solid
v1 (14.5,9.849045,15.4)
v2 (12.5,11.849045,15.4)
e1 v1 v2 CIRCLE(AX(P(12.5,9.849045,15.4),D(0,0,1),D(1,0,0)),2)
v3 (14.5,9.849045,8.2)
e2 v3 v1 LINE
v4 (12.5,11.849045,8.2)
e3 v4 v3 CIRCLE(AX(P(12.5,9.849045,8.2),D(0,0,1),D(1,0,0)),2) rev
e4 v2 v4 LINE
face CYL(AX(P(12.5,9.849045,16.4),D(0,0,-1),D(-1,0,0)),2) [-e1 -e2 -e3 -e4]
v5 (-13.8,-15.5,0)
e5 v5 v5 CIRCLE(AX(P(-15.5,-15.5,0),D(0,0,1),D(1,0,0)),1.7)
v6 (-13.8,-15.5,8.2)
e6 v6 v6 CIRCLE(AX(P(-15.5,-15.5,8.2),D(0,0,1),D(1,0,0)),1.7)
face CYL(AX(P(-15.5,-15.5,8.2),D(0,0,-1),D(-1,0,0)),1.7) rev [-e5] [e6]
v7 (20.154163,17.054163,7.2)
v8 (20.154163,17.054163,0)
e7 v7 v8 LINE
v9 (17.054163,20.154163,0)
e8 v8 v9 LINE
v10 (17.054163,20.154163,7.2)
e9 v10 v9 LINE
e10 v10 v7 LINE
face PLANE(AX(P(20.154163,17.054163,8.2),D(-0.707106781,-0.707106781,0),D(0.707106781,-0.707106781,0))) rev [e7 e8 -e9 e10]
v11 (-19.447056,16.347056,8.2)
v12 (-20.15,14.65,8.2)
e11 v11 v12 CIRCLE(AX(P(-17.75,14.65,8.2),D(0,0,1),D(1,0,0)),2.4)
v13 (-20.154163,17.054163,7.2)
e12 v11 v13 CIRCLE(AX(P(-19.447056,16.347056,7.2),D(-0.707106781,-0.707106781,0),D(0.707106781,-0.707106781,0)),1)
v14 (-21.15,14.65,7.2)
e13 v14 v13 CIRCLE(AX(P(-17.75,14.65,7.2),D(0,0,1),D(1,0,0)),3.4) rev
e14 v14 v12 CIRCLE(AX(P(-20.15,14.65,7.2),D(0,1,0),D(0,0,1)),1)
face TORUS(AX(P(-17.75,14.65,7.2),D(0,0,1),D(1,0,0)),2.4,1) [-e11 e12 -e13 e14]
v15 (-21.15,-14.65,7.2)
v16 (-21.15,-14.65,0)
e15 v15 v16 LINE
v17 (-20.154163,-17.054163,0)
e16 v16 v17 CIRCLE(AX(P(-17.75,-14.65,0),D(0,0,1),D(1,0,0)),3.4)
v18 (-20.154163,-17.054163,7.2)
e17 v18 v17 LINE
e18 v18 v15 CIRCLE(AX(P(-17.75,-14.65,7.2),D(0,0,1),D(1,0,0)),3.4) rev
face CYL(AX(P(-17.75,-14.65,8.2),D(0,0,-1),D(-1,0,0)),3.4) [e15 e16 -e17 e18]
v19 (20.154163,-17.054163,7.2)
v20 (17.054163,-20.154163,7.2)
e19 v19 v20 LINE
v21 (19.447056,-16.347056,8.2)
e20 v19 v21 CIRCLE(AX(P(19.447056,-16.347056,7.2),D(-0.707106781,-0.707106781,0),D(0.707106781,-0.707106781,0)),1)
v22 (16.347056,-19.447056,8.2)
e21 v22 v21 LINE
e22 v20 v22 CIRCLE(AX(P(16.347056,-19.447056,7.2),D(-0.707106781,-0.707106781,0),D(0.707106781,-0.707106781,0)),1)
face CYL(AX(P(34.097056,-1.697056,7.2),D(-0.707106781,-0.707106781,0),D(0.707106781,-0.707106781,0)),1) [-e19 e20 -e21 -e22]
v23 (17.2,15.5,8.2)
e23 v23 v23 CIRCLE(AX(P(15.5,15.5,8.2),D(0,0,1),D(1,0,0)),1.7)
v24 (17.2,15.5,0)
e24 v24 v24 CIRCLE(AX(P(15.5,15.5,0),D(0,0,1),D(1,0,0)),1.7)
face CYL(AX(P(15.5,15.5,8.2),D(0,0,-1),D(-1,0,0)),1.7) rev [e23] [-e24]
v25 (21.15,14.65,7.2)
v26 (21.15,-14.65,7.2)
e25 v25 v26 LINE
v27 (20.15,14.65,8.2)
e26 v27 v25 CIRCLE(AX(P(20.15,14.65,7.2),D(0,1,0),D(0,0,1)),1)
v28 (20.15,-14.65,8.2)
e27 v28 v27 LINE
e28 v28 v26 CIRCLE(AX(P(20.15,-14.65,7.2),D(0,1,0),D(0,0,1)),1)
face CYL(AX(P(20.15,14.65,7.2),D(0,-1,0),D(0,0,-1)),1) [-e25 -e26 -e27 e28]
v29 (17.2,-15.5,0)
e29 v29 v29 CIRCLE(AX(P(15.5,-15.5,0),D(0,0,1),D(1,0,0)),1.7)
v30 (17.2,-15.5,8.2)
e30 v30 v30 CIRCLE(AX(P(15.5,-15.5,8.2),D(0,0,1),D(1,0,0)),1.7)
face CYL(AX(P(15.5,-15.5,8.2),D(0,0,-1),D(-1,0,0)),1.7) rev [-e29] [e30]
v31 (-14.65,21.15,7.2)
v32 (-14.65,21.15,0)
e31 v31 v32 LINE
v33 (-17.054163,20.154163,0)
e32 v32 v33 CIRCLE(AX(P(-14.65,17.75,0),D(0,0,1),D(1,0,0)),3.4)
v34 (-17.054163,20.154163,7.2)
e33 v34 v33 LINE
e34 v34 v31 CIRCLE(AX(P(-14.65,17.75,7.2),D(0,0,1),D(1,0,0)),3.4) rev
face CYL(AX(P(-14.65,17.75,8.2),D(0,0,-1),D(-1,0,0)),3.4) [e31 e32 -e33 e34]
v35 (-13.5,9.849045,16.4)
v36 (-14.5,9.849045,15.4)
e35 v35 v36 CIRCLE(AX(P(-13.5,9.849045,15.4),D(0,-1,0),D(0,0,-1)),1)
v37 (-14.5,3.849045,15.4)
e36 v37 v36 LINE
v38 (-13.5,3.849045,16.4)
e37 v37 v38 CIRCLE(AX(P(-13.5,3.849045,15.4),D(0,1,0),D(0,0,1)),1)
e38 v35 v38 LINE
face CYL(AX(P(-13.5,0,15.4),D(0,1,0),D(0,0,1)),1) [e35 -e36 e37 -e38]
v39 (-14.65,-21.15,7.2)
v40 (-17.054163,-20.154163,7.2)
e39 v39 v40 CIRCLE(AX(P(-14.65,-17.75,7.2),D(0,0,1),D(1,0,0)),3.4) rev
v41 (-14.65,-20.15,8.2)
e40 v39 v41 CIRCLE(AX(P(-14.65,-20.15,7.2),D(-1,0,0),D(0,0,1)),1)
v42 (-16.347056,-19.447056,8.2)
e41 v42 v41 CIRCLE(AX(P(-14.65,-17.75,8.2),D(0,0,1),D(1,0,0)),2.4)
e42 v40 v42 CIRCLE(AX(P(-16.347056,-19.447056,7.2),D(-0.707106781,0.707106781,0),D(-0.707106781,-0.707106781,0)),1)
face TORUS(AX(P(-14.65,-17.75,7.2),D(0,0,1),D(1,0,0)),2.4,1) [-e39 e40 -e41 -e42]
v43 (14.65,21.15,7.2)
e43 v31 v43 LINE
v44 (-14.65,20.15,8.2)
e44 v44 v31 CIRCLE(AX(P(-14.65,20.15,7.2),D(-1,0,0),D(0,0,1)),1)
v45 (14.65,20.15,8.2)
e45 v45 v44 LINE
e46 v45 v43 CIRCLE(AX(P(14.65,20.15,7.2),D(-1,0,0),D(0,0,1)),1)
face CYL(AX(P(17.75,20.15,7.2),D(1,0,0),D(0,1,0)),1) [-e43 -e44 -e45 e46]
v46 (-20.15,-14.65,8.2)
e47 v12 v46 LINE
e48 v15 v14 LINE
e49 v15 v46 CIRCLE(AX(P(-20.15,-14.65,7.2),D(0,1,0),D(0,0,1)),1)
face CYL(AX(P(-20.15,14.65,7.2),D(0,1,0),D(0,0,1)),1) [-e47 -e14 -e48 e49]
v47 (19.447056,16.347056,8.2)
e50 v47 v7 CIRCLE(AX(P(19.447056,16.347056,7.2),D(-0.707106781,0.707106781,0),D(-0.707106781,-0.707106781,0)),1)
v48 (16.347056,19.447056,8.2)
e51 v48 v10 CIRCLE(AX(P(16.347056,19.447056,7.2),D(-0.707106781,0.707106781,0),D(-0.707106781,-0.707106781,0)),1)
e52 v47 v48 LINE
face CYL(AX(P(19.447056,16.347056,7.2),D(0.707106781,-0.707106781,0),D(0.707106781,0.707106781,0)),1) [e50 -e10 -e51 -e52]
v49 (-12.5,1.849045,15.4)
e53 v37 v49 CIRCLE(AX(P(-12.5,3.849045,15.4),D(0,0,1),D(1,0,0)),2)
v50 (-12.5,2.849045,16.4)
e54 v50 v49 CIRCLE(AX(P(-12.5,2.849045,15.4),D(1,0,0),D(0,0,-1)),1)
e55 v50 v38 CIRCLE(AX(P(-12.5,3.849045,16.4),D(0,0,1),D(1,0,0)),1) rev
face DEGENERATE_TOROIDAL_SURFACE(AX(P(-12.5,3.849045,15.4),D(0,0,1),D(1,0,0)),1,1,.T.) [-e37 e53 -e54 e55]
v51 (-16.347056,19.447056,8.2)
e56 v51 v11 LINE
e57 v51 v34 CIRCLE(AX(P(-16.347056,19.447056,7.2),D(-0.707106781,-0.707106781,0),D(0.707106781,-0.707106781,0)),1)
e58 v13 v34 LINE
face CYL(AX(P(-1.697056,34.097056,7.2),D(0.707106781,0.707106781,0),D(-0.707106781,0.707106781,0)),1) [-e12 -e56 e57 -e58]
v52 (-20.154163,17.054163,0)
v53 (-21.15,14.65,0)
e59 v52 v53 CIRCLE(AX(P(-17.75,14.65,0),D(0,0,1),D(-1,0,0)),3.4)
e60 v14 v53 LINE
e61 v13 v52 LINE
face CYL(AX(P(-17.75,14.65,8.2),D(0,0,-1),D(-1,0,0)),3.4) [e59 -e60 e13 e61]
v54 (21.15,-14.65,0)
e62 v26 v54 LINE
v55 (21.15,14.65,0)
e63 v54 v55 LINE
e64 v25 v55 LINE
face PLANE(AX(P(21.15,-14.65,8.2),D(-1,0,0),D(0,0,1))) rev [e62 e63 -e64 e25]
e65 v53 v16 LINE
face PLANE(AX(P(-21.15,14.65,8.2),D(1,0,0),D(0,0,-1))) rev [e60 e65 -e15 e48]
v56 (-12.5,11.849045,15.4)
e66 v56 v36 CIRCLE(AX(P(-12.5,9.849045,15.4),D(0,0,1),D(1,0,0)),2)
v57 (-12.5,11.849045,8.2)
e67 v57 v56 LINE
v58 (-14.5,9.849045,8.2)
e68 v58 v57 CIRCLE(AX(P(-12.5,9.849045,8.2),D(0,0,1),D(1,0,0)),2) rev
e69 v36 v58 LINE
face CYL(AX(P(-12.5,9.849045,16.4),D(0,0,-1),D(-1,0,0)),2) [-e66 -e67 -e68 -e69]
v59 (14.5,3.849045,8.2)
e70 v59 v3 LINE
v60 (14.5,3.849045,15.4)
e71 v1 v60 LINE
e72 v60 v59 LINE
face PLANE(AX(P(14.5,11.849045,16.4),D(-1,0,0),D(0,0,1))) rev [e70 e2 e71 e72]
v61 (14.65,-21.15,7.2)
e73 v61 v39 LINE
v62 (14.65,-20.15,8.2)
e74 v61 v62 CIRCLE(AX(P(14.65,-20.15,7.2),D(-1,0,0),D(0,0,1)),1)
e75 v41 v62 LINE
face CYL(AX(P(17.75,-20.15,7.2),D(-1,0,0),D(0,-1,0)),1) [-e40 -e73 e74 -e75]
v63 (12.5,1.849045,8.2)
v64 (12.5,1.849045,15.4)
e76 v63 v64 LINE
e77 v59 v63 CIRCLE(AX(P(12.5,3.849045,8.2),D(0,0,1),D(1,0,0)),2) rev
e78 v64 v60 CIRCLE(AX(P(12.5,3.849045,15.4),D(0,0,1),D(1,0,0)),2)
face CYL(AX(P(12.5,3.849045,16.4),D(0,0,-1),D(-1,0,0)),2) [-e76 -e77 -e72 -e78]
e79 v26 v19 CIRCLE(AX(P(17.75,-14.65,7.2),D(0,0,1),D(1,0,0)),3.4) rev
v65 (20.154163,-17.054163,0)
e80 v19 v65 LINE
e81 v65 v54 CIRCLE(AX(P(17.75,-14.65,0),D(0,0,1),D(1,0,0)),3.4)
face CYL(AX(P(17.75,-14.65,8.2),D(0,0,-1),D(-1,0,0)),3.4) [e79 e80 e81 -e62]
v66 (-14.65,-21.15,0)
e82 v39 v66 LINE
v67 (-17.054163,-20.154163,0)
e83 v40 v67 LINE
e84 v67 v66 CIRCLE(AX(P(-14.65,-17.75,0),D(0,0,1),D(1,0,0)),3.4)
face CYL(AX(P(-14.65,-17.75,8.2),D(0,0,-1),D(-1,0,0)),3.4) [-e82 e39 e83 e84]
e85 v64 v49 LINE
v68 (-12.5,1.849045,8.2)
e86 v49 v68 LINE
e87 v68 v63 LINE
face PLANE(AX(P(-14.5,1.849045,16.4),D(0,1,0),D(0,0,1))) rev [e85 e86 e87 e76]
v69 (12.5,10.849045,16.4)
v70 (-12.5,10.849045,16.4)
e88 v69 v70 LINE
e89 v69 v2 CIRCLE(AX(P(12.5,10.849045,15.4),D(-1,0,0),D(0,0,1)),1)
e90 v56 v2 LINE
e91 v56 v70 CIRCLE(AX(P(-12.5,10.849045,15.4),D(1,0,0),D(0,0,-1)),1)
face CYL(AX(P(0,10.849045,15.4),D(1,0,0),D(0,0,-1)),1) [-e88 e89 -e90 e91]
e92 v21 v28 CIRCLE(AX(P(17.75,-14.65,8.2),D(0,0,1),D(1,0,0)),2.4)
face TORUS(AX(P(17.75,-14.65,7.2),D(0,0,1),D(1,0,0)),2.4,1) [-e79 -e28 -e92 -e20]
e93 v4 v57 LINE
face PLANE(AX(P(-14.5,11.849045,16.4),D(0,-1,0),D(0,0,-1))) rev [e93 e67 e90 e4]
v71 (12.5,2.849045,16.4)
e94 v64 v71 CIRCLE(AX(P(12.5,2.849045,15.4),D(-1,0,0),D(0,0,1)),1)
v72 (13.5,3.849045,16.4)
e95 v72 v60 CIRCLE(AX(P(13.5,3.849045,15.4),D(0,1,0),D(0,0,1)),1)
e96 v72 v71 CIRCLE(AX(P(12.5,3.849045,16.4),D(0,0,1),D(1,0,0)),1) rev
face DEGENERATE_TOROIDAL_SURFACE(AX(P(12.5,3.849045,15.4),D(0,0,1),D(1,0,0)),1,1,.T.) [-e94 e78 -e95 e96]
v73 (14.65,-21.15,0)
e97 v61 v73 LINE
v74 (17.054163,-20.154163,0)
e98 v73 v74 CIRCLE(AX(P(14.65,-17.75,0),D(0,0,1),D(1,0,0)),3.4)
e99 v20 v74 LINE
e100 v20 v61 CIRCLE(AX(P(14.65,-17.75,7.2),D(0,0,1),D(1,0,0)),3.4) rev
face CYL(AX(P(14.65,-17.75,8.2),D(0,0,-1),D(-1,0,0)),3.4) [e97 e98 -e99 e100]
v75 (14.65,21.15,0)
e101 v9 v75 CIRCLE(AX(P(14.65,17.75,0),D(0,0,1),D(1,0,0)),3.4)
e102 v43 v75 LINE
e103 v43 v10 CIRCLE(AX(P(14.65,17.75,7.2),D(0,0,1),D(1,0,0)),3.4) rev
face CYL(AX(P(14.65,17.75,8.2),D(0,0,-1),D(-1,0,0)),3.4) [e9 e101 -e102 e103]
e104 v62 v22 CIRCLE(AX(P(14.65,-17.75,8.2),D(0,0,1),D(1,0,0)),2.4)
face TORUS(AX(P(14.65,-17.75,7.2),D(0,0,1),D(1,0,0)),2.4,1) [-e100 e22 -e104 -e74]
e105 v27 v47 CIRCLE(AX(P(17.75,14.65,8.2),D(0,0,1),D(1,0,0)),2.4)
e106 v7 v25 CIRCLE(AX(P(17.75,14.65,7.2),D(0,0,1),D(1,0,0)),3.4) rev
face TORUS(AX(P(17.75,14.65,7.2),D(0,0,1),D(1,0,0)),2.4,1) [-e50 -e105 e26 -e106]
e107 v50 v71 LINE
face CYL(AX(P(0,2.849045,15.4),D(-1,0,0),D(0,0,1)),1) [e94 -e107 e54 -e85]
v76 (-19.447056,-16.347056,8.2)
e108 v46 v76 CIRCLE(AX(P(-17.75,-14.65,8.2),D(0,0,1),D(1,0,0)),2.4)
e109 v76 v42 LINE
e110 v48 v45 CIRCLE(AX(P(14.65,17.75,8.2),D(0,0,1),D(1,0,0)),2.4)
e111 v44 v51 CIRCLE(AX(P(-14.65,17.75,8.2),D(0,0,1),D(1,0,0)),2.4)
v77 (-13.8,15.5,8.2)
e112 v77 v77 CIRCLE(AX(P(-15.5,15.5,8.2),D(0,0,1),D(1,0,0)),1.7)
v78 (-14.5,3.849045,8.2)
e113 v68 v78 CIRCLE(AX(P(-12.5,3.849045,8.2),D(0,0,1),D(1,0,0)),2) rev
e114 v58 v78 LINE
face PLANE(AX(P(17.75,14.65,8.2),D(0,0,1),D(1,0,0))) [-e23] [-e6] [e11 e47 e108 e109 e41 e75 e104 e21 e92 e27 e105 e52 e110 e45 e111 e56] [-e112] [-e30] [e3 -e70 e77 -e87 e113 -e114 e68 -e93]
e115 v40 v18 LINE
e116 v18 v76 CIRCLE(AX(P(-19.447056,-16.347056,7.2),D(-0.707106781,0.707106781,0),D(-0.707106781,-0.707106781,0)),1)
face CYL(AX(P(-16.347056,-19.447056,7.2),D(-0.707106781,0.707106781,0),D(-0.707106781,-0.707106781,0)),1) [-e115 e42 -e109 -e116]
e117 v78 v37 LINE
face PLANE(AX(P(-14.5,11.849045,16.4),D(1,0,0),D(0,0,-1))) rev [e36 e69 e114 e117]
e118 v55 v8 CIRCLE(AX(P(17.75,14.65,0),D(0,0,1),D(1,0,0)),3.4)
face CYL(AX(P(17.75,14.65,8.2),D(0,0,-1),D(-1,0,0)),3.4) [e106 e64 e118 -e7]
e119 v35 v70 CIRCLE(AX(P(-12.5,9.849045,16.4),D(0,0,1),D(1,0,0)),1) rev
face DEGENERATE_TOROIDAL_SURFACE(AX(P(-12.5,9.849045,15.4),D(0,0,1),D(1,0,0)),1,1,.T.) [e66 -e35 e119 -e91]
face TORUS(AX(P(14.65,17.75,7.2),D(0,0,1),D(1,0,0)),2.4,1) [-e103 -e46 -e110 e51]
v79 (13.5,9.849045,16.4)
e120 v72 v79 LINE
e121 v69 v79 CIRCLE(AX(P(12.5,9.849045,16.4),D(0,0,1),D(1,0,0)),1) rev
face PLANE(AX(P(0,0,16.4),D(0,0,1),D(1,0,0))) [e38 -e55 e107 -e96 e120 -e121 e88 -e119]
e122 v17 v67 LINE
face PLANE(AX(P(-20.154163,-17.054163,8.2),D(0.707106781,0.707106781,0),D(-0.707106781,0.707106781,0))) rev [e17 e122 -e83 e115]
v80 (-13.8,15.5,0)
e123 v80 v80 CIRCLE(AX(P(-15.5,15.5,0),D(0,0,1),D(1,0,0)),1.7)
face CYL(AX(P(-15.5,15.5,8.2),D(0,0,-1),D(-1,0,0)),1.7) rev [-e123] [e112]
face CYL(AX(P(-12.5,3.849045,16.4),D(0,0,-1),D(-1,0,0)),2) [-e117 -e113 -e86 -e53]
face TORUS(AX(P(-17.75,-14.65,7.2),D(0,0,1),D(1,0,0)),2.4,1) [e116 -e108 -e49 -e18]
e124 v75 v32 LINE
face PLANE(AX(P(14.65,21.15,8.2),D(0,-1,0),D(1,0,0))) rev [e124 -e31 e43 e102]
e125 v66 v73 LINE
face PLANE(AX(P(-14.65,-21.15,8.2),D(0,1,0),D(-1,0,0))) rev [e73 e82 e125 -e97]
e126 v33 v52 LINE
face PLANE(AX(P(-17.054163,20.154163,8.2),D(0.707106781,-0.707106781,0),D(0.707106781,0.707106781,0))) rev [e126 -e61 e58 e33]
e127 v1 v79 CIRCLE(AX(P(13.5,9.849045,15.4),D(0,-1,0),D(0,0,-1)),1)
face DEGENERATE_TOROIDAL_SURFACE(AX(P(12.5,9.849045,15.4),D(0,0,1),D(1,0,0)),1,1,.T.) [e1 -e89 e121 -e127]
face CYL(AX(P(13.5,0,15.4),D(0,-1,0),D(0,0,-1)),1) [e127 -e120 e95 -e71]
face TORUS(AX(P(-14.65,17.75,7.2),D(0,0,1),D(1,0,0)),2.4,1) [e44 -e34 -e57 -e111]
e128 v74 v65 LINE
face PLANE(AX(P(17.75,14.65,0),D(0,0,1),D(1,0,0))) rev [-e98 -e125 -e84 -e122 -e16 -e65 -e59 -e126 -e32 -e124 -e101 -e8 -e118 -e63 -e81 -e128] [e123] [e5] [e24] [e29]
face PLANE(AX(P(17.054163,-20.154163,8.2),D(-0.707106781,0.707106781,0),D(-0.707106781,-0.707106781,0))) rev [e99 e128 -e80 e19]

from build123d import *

# Parameters (mm, degrees)
SKETCH1_R           = 1.7
BOSS_EXTRUDE1_DEPTH = 8.2
SKETCH2_W           = 29
SKETCH2_H           = 10
BOSS_EXTRUDE2_DEPTH = 8.2
FILLET2_R           = 1
FILLET3_R           = 2


with BuildPart() as part:
    # Sketch1 → Boss-Extrude1 (new body)
    with BuildSketch(Plane.XY):
        with BuildLine():
            Line((-21.15, 14.65), (-21.15, -14.65))
            ThreePointArc((-21.15, -14.65), (-20.891190411, -15.95112367), (-20.154163056, -17.054163056))
            Line((-20.154163056, -17.054163056), (-17.054163056, -20.154163056))
            ThreePointArc((-17.054163056, -20.154163056), (-15.95112367, -20.891190411), (-14.65, -21.15))
            Line((-14.65, -21.15), (14.65, -21.15))
            ThreePointArc((14.65, -21.15), (15.95112367, -20.891190411), (17.054163056, -20.154163056))
            Line((17.054163056, -20.154163056), (20.154163056, -17.054163056))
            ThreePointArc((20.154163056, -17.054163056), (20.891190411, -15.95112367), (21.15, -14.65))
            Line((21.15, -14.65), (21.15, 14.65))
            ThreePointArc((21.15, 14.65), (20.891190411, 15.95112367), (20.154163056, 17.054163056))
            Line((20.154163056, 17.054163056), (17.054163056, 20.154163056))
            ThreePointArc((17.054163056, 20.154163056), (15.95112367, 20.891190411), (14.65, 21.15))
            Line((14.65, 21.15), (-14.65, 21.15))
            ThreePointArc((-14.65, 21.15), (-15.95112367, 20.891190411), (-17.054163056, 20.154163056))
            Line((-17.054163056, 20.154163056), (-20.154163056, 17.054163056))
            ThreePointArc((-20.154163056, 17.054163056), (-20.891190411, 15.95112367), (-21.15, 14.65))
        make_face()
        with Locations((-15.5, 15.5)):
            Circle(SKETCH1_R, mode=Mode.SUBTRACT)
        with Locations((15.5, 15.5)):
            Circle(SKETCH1_R, mode=Mode.SUBTRACT)
        with Locations((15.5, -15.5)):
            Circle(SKETCH1_R, mode=Mode.SUBTRACT)
        with Locations((-15.5, -15.5)):
            Circle(SKETCH1_R, mode=Mode.SUBTRACT)
    extrude(amount=BOSS_EXTRUDE1_DEPTH)

    # Sketch2 → Boss-Extrude2 (add)
    with BuildSketch(Plane.XY.offset(8.2)):
        with Locations((0, 6.849045043)):
            Rectangle(SKETCH2_W, SKETCH2_H)
    extrude(amount=BOSS_EXTRUDE2_DEPTH)

    # Fillet2
    fillet2_edges = [part.edges().sort_by_distance(p)[0] for p in [
        (15.95112367, 20.891190411, 8.2),
        (0, 21.15, 8.2),
        (-15.95112367, 20.891190411, 8.2),
        (-18.604163056, 18.604163056, 8.2),
        (-20.891190411, 15.95112367, 8.2),
        (-21.15, 0, 8.2),
        (-20.891190411, -15.95112367, 8.2),
        (-18.604163056, -18.604163056, 8.2),
        (-15.95112367, -20.891190411, 8.2),
        (0, -21.15, 8.2),
        (20.891190411, 15.95112367, 8.2),
        (15.95112367, -20.891190411, 8.2),
        (18.604163056, -18.604163056, 8.2),
        (20.891190411, -15.95112367, 8.2),
        (21.15, 0, 8.2),
        (-14.5, 6.849045043, 16.4),
        (0, 1.849045043, 16.4),
        (14.5, 6.849045043, 16.4),
        (0, 11.849045043, 16.4),
        (18.604163056, 18.604163056, 8.2),
    ]]
    fillet(fillet2_edges, radius=FILLET2_R)

    # Fillet3
    # the kernel refuses this fillet: 2 mm, written as the material it takes off along each edge
    with BuildSketch(Plane(origin=(12.5, 3.849045043, 16.4), x_dir=(0, -1, 0), z_dir=(-1, 0, 0))) as fillet3_piece_1:
        with BuildLine():
            CenterArc((1, -1), 1, 0, 90)
            Line((2, -1), (2, 0))
            Line((2, 0), (1, 0))
        make_face()
    revolve(axis=Axis((12.5, 3.849045043, 16.4), (0, 0, 1)), revolution_arc=90, mode=Mode.SUBTRACT)
    with BuildSketch(Plane(origin=(-12.5, 3.849045043, 16.4), x_dir=(-1, 0, 0), z_dir=(0, 1, 0))) as fillet3_piece_2:
        with BuildLine():
            CenterArc((1, -1), 1, 0, 90)
            Line((2, -1), (2, 0))
            Line((2, 0), (1, 0))
        make_face()
    revolve(axis=Axis((-12.5, 3.849045043, 16.4), (0, 0, 1)), revolution_arc=90, mode=Mode.SUBTRACT)
    with BuildSketch(Plane(origin=(12.5, 9.849045043, 16.4), x_dir=(1, 0, 0), z_dir=(0, -1, 0))) as fillet3_piece_3:
        with BuildLine():
            CenterArc((1, -1), 1, 0, 90)
            Line((2, -1), (2, 0))
            Line((2, 0), (1, 0))
        make_face()
    revolve(axis=Axis((12.5, 9.849045043, 16.4), (0, 0, 1)), revolution_arc=90, mode=Mode.SUBTRACT)
    with BuildSketch(Plane(origin=(-12.5, 9.849045043, 16.4), x_dir=(0, 1, 0), z_dir=(1, 0, 0))) as fillet3_piece_4:
        with BuildLine():
            CenterArc((1, -1), 1, 0, 90)
            Line((2, -1), (2, 0))
            Line((2, 0), (1, 0))
        make_face()
    revolve(axis=Axis((-12.5, 9.849045043, 16.4), (0, 0, 1)), revolution_arc=90, mode=Mode.SUBTRACT)
    with BuildSketch(Plane(origin=(-14.5, 11.849045043, 8.2), x_dir=(0, -1, 0), z_dir=(0, 0, 1))) as fillet3_piece_5:
        with BuildLine():
            CenterArc((FILLET3_R, FILLET3_R), FILLET3_R, 180, 90)
            Line((0, FILLET3_R), (0, 0))
            Line((0, 0), (FILLET3_R, 0))
        make_face()
    extrude(amount=8.2, mode=Mode.SUBTRACT)
    with BuildSketch(Plane(origin=(14.5, 11.849045043, 8.2), x_dir=(0, -1, 0), z_dir=(0, 0, 1)), Plane(origin=(14.5, 1.849045043, 8.2), x_dir=(-1, 0, 0), z_dir=(0, 0, 1)), Plane(origin=(-14.5, 1.849045043, 8.2), x_dir=(0, 1, 0), z_dir=(0, 0, 1))) as fillet3_piece_6:
        with BuildLine():
            CenterArc((FILLET3_R, -FILLET3_R), FILLET3_R, 90, 90)
            Line((0, -FILLET3_R), (0, 0))
            Line((0, 0), (FILLET3_R, 0))
        make_face()
    extrude(amount=8.2, mode=Mode.SUBTRACT)


solid = part.part
